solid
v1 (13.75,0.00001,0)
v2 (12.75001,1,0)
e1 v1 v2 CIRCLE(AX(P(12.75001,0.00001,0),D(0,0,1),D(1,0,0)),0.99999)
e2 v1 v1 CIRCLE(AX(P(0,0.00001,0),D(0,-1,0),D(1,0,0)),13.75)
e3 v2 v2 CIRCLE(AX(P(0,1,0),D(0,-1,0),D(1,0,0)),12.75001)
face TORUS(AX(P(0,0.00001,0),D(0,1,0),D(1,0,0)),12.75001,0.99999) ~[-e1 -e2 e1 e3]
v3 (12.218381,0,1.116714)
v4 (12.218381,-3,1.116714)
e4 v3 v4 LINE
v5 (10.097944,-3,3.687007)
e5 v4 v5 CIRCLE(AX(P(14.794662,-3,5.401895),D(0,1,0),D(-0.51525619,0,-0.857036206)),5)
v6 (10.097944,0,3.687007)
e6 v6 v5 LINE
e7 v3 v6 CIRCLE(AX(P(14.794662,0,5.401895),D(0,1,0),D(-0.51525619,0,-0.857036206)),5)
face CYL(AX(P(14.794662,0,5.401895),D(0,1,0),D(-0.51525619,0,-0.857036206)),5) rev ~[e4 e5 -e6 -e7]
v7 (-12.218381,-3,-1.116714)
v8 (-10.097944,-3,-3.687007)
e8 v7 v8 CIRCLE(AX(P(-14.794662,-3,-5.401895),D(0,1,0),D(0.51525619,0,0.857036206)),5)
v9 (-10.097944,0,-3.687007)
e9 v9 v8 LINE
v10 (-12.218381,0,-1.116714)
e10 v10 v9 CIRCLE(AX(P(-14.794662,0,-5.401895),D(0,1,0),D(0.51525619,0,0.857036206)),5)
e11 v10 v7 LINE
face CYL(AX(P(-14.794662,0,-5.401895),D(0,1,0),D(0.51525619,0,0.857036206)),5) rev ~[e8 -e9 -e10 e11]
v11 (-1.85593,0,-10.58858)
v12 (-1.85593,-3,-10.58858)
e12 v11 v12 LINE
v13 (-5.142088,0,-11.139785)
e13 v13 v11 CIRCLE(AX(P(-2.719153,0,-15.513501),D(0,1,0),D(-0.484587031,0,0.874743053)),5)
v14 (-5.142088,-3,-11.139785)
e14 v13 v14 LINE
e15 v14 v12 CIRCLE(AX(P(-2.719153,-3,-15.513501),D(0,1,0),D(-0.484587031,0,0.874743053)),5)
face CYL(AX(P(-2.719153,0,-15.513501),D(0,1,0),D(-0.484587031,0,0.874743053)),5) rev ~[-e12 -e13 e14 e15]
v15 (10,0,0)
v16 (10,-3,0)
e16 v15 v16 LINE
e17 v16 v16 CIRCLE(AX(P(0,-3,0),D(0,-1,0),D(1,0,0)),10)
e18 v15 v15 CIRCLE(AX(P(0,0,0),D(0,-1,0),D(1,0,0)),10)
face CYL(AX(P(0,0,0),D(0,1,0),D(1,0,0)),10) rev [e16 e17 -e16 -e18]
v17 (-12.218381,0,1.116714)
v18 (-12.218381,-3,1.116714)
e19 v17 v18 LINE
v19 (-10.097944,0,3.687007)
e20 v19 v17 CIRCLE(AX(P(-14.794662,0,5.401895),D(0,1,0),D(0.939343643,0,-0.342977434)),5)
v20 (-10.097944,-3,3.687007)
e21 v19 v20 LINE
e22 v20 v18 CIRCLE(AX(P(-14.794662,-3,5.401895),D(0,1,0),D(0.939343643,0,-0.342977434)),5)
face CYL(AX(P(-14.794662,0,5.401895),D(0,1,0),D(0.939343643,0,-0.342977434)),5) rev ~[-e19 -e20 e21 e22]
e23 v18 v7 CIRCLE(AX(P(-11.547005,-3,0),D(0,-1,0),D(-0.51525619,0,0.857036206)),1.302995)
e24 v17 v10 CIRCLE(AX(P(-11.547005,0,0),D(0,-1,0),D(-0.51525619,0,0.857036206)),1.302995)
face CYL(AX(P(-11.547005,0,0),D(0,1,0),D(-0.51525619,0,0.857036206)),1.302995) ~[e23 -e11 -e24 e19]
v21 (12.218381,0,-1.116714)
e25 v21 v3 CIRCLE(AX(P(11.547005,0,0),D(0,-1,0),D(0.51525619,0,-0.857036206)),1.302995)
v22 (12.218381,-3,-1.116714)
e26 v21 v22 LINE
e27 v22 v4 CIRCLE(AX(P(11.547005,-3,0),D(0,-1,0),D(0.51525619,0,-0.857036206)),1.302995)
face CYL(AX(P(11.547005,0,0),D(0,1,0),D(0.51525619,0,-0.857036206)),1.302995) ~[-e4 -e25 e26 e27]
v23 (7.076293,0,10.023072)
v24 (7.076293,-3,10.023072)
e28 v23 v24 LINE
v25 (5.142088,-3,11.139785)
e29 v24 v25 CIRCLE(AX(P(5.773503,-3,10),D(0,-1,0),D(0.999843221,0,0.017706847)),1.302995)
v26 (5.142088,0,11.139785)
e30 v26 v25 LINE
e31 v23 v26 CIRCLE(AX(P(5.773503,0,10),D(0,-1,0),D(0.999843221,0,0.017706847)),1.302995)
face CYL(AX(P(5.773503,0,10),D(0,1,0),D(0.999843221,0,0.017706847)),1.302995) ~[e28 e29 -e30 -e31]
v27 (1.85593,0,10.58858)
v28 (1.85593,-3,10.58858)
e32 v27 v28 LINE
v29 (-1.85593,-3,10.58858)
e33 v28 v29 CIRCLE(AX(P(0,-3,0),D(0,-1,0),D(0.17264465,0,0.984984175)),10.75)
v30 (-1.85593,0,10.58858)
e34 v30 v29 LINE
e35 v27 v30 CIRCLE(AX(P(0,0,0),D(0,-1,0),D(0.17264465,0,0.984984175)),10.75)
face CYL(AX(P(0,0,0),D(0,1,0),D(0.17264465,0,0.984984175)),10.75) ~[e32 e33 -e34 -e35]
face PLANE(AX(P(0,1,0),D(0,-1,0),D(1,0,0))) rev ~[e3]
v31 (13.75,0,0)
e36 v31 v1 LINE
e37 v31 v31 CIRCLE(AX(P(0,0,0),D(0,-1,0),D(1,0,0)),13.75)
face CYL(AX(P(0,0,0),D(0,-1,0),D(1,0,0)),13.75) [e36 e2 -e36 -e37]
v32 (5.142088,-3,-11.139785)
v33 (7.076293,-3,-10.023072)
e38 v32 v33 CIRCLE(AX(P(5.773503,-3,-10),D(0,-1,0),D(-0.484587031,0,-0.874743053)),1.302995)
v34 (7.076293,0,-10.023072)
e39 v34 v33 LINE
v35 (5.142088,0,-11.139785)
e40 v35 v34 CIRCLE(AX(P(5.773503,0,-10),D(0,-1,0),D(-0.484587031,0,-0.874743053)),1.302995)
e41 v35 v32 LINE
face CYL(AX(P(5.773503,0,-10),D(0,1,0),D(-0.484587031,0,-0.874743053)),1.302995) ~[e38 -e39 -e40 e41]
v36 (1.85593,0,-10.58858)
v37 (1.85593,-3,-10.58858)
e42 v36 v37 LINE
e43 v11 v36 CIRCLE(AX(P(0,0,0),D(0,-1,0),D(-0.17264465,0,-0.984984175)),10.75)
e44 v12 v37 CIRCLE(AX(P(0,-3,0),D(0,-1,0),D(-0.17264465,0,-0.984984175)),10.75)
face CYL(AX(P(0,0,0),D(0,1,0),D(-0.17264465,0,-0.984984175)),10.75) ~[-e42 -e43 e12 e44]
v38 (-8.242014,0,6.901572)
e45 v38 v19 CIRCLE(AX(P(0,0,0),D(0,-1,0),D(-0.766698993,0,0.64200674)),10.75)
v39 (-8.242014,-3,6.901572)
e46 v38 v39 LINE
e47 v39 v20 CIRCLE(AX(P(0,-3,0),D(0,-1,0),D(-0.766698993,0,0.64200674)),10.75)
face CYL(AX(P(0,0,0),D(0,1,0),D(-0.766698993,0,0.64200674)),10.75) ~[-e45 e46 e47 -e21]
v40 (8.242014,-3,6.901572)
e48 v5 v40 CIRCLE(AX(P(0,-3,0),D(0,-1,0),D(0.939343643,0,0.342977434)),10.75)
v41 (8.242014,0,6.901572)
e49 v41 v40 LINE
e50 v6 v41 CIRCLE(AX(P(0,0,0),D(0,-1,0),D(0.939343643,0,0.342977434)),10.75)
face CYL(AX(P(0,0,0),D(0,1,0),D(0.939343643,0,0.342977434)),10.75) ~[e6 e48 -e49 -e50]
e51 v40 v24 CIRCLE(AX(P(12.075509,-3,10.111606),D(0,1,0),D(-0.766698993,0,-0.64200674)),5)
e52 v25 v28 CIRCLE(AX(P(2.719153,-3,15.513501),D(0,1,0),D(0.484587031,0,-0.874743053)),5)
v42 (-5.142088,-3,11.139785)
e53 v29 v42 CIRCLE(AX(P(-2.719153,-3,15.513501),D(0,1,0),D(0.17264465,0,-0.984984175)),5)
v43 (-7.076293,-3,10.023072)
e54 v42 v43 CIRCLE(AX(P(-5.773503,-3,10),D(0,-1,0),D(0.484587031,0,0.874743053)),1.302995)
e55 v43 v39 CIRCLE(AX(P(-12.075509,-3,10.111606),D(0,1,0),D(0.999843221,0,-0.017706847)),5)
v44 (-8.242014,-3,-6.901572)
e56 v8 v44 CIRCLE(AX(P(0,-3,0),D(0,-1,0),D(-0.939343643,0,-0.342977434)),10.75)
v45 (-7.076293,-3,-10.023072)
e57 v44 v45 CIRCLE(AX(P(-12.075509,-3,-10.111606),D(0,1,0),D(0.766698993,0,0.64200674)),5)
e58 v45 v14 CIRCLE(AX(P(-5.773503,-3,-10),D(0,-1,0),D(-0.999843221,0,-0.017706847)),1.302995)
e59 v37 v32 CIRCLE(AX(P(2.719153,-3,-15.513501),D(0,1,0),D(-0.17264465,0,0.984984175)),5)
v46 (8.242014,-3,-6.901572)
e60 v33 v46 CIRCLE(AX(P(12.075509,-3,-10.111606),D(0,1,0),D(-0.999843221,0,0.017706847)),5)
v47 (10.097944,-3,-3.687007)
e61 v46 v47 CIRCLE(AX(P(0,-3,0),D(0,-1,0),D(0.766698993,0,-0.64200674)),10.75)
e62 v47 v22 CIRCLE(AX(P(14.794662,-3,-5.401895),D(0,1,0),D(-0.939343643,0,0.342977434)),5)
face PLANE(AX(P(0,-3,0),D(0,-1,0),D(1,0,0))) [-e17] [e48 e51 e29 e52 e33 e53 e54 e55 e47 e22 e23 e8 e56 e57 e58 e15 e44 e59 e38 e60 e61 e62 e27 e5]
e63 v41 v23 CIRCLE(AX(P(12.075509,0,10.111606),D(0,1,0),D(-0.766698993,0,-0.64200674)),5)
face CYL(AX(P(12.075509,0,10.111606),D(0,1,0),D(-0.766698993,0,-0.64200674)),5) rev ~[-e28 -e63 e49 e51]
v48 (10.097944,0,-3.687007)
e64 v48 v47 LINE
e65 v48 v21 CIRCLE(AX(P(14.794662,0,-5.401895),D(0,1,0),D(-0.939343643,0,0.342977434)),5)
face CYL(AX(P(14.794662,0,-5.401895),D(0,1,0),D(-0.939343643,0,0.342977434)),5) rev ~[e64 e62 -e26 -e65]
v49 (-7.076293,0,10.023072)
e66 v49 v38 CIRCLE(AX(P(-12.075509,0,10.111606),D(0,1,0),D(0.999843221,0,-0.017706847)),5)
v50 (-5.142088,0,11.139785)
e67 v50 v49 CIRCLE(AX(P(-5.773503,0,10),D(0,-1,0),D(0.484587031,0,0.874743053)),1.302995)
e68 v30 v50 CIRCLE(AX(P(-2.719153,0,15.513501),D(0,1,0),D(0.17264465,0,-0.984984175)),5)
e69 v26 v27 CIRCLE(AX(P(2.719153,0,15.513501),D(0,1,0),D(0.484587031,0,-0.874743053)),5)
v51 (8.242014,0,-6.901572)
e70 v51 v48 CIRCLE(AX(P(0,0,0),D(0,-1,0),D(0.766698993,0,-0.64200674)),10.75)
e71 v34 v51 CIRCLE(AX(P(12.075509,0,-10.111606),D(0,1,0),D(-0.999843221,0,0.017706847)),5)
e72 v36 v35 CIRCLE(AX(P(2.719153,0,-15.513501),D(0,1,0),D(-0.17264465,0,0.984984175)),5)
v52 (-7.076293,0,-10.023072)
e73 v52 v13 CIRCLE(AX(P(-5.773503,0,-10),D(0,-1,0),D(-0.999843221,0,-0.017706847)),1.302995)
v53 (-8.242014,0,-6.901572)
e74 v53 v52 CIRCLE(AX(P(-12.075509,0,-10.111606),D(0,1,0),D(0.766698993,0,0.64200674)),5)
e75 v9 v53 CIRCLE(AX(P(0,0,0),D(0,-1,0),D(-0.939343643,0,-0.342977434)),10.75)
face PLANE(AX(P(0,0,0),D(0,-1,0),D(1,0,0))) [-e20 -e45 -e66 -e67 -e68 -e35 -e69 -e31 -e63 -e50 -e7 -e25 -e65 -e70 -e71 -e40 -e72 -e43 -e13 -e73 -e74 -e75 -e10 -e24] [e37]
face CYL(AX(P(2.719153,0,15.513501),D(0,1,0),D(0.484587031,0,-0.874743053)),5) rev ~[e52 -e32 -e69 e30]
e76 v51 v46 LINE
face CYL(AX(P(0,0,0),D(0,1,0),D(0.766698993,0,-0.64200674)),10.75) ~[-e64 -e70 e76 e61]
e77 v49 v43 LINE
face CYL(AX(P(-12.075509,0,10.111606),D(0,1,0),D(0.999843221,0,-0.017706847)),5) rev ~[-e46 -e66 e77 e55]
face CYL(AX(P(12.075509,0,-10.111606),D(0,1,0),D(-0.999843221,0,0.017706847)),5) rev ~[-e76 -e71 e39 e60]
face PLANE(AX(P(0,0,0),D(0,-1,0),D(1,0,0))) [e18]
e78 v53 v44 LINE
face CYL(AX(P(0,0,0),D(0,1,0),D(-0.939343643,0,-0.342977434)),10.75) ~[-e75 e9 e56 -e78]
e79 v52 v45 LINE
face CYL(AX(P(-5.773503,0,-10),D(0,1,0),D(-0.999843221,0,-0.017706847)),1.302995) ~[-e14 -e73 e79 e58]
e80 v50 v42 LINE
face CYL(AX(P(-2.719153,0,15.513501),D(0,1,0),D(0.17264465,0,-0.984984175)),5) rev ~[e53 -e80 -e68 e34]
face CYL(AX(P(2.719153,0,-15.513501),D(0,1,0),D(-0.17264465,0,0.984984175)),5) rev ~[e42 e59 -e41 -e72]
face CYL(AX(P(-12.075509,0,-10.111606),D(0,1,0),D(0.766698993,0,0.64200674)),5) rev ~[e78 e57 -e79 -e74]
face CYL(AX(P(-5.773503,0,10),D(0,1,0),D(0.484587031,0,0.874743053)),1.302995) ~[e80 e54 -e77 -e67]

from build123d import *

# Parameters (mm, degrees)
F0_R     = 10
F1_DEPTH = 3
F2_R     = 13.75
F3_DEPTH = 1
F4_R     = 0.99999


# Not quite as in the source:
# - a fillet or chamfer is up to 0.001 mm smaller than in the source, because OpenCascade refuses the exact size


with BuildPart() as f1:
    # F0 (on Front) → F1 (new body)
    with BuildSketch(Plane.XZ):
        with BuildLine():
            ThreePointArc((-7.0762930266, 10.0230719262), (-7.391479251, 8.3623594503), (-8.2420141709, 6.901572459))
            ThreePointArc((-8.2420141709, 6.901572459), (-9.3097730907, 5.375), (-10.097944161, 3.6870074208))
            ThreePointArc((-10.097944161, 3.6870074208), (-10.937755345, 2.2200290777), (-12.2183814254, 1.1167135625))
            ThreePointArc((-12.2183814254, 1.1167135625), (-12.85, 0), (-12.2183814254, -1.1167135625))
            ThreePointArc((-12.2183814254, -1.1167135625), (-10.937755345, -2.2200290777), (-10.097944161, -3.6870074208))
            ThreePointArc((-10.097944161, -3.6870074208), (-9.3097730907, -5.375), (-8.2420141709, -6.901572459))
            ThreePointArc((-8.2420141709, -6.901572459), (-7.391479251, -8.3623594503), (-7.0762930266, -10.0230719262))
            ThreePointArc((-7.0762930266, -10.0230719262), (-6.425, -11.1284264386), (-5.1420883988, -11.1397854887))
            ThreePointArc((-5.1420883988, -11.1397854887), (-3.5462760941, -10.582388528), (-1.8559299902, -10.5885798798))
            ThreePointArc((-1.8559299902, -10.5885798798), (0, -10.75), (1.8559299902, -10.5885798798))
            ThreePointArc((1.8559299902, -10.5885798798), (3.5462760941, -10.582388528), (5.1420883988, -11.1397854887))
            ThreePointArc((5.1420883988, -11.1397854887), (6.425, -11.1284264386), (7.0762930266, -10.0230719262))
            ThreePointArc((7.0762930266, -10.0230719262), (7.391479251, -8.3623594503), (8.2420141709, -6.901572459))
            ThreePointArc((8.2420141709, -6.901572459), (9.3097730907, -5.375), (10.097944161, -3.6870074208))
            ThreePointArc((10.097944161, -3.6870074208), (10.937755345, -2.2200290777), (12.2183814254, -1.1167135625))
            ThreePointArc((12.2183814254, -1.1167135625), (12.85, 0), (12.2183814254, 1.1167135625))
            ThreePointArc((12.2183814254, 1.1167135625), (10.937755345, 2.2200290777), (10.097944161, 3.6870074208))
            ThreePointArc((10.097944161, 3.6870074208), (9.3097730907, 5.375), (8.2420141709, 6.901572459))
            ThreePointArc((8.2420141709, 6.901572459), (7.391479251, 8.3623594503), (7.0762930266, 10.0230719262))
            ThreePointArc((7.0762930266, 10.0230719262), (6.425, 11.1284264386), (5.1420883988, 11.1397854887))
            ThreePointArc((5.1420883988, 11.1397854887), (3.5462760941, 10.582388528), (1.8559299902, 10.5885798798))
            ThreePointArc((1.8559299902, 10.5885798798), (0, 10.75), (-1.8559299902, 10.5885798798))
            ThreePointArc((-1.8559299902, 10.5885798798), (-3.5462760941, 10.582388528), (-5.1420883988, 11.1397854887))
            ThreePointArc((-5.1420883988, 11.1397854887), (-6.425, 11.1284264386), (-7.0762930266, 10.0230719262))
        make_face()
        Circle(F0_R, mode=Mode.SUBTRACT)
    extrude(amount=F1_DEPTH)

    # F2 (on Front) → F3 (join)
    with BuildSketch(Plane.XZ):
        Circle(F2_R)
    extrude(amount=-F3_DEPTH)

    # F4 (radius 1 in the source; OpenCascade refuses exactly that, so slightly less here)
    f4_edges = [f1.edges().sort_by_distance(p)[0] for p in [
        (-13.75, 1, 0),
    ]]
    fillet(f4_edges, radius=F4_R)


solid = f1.part
